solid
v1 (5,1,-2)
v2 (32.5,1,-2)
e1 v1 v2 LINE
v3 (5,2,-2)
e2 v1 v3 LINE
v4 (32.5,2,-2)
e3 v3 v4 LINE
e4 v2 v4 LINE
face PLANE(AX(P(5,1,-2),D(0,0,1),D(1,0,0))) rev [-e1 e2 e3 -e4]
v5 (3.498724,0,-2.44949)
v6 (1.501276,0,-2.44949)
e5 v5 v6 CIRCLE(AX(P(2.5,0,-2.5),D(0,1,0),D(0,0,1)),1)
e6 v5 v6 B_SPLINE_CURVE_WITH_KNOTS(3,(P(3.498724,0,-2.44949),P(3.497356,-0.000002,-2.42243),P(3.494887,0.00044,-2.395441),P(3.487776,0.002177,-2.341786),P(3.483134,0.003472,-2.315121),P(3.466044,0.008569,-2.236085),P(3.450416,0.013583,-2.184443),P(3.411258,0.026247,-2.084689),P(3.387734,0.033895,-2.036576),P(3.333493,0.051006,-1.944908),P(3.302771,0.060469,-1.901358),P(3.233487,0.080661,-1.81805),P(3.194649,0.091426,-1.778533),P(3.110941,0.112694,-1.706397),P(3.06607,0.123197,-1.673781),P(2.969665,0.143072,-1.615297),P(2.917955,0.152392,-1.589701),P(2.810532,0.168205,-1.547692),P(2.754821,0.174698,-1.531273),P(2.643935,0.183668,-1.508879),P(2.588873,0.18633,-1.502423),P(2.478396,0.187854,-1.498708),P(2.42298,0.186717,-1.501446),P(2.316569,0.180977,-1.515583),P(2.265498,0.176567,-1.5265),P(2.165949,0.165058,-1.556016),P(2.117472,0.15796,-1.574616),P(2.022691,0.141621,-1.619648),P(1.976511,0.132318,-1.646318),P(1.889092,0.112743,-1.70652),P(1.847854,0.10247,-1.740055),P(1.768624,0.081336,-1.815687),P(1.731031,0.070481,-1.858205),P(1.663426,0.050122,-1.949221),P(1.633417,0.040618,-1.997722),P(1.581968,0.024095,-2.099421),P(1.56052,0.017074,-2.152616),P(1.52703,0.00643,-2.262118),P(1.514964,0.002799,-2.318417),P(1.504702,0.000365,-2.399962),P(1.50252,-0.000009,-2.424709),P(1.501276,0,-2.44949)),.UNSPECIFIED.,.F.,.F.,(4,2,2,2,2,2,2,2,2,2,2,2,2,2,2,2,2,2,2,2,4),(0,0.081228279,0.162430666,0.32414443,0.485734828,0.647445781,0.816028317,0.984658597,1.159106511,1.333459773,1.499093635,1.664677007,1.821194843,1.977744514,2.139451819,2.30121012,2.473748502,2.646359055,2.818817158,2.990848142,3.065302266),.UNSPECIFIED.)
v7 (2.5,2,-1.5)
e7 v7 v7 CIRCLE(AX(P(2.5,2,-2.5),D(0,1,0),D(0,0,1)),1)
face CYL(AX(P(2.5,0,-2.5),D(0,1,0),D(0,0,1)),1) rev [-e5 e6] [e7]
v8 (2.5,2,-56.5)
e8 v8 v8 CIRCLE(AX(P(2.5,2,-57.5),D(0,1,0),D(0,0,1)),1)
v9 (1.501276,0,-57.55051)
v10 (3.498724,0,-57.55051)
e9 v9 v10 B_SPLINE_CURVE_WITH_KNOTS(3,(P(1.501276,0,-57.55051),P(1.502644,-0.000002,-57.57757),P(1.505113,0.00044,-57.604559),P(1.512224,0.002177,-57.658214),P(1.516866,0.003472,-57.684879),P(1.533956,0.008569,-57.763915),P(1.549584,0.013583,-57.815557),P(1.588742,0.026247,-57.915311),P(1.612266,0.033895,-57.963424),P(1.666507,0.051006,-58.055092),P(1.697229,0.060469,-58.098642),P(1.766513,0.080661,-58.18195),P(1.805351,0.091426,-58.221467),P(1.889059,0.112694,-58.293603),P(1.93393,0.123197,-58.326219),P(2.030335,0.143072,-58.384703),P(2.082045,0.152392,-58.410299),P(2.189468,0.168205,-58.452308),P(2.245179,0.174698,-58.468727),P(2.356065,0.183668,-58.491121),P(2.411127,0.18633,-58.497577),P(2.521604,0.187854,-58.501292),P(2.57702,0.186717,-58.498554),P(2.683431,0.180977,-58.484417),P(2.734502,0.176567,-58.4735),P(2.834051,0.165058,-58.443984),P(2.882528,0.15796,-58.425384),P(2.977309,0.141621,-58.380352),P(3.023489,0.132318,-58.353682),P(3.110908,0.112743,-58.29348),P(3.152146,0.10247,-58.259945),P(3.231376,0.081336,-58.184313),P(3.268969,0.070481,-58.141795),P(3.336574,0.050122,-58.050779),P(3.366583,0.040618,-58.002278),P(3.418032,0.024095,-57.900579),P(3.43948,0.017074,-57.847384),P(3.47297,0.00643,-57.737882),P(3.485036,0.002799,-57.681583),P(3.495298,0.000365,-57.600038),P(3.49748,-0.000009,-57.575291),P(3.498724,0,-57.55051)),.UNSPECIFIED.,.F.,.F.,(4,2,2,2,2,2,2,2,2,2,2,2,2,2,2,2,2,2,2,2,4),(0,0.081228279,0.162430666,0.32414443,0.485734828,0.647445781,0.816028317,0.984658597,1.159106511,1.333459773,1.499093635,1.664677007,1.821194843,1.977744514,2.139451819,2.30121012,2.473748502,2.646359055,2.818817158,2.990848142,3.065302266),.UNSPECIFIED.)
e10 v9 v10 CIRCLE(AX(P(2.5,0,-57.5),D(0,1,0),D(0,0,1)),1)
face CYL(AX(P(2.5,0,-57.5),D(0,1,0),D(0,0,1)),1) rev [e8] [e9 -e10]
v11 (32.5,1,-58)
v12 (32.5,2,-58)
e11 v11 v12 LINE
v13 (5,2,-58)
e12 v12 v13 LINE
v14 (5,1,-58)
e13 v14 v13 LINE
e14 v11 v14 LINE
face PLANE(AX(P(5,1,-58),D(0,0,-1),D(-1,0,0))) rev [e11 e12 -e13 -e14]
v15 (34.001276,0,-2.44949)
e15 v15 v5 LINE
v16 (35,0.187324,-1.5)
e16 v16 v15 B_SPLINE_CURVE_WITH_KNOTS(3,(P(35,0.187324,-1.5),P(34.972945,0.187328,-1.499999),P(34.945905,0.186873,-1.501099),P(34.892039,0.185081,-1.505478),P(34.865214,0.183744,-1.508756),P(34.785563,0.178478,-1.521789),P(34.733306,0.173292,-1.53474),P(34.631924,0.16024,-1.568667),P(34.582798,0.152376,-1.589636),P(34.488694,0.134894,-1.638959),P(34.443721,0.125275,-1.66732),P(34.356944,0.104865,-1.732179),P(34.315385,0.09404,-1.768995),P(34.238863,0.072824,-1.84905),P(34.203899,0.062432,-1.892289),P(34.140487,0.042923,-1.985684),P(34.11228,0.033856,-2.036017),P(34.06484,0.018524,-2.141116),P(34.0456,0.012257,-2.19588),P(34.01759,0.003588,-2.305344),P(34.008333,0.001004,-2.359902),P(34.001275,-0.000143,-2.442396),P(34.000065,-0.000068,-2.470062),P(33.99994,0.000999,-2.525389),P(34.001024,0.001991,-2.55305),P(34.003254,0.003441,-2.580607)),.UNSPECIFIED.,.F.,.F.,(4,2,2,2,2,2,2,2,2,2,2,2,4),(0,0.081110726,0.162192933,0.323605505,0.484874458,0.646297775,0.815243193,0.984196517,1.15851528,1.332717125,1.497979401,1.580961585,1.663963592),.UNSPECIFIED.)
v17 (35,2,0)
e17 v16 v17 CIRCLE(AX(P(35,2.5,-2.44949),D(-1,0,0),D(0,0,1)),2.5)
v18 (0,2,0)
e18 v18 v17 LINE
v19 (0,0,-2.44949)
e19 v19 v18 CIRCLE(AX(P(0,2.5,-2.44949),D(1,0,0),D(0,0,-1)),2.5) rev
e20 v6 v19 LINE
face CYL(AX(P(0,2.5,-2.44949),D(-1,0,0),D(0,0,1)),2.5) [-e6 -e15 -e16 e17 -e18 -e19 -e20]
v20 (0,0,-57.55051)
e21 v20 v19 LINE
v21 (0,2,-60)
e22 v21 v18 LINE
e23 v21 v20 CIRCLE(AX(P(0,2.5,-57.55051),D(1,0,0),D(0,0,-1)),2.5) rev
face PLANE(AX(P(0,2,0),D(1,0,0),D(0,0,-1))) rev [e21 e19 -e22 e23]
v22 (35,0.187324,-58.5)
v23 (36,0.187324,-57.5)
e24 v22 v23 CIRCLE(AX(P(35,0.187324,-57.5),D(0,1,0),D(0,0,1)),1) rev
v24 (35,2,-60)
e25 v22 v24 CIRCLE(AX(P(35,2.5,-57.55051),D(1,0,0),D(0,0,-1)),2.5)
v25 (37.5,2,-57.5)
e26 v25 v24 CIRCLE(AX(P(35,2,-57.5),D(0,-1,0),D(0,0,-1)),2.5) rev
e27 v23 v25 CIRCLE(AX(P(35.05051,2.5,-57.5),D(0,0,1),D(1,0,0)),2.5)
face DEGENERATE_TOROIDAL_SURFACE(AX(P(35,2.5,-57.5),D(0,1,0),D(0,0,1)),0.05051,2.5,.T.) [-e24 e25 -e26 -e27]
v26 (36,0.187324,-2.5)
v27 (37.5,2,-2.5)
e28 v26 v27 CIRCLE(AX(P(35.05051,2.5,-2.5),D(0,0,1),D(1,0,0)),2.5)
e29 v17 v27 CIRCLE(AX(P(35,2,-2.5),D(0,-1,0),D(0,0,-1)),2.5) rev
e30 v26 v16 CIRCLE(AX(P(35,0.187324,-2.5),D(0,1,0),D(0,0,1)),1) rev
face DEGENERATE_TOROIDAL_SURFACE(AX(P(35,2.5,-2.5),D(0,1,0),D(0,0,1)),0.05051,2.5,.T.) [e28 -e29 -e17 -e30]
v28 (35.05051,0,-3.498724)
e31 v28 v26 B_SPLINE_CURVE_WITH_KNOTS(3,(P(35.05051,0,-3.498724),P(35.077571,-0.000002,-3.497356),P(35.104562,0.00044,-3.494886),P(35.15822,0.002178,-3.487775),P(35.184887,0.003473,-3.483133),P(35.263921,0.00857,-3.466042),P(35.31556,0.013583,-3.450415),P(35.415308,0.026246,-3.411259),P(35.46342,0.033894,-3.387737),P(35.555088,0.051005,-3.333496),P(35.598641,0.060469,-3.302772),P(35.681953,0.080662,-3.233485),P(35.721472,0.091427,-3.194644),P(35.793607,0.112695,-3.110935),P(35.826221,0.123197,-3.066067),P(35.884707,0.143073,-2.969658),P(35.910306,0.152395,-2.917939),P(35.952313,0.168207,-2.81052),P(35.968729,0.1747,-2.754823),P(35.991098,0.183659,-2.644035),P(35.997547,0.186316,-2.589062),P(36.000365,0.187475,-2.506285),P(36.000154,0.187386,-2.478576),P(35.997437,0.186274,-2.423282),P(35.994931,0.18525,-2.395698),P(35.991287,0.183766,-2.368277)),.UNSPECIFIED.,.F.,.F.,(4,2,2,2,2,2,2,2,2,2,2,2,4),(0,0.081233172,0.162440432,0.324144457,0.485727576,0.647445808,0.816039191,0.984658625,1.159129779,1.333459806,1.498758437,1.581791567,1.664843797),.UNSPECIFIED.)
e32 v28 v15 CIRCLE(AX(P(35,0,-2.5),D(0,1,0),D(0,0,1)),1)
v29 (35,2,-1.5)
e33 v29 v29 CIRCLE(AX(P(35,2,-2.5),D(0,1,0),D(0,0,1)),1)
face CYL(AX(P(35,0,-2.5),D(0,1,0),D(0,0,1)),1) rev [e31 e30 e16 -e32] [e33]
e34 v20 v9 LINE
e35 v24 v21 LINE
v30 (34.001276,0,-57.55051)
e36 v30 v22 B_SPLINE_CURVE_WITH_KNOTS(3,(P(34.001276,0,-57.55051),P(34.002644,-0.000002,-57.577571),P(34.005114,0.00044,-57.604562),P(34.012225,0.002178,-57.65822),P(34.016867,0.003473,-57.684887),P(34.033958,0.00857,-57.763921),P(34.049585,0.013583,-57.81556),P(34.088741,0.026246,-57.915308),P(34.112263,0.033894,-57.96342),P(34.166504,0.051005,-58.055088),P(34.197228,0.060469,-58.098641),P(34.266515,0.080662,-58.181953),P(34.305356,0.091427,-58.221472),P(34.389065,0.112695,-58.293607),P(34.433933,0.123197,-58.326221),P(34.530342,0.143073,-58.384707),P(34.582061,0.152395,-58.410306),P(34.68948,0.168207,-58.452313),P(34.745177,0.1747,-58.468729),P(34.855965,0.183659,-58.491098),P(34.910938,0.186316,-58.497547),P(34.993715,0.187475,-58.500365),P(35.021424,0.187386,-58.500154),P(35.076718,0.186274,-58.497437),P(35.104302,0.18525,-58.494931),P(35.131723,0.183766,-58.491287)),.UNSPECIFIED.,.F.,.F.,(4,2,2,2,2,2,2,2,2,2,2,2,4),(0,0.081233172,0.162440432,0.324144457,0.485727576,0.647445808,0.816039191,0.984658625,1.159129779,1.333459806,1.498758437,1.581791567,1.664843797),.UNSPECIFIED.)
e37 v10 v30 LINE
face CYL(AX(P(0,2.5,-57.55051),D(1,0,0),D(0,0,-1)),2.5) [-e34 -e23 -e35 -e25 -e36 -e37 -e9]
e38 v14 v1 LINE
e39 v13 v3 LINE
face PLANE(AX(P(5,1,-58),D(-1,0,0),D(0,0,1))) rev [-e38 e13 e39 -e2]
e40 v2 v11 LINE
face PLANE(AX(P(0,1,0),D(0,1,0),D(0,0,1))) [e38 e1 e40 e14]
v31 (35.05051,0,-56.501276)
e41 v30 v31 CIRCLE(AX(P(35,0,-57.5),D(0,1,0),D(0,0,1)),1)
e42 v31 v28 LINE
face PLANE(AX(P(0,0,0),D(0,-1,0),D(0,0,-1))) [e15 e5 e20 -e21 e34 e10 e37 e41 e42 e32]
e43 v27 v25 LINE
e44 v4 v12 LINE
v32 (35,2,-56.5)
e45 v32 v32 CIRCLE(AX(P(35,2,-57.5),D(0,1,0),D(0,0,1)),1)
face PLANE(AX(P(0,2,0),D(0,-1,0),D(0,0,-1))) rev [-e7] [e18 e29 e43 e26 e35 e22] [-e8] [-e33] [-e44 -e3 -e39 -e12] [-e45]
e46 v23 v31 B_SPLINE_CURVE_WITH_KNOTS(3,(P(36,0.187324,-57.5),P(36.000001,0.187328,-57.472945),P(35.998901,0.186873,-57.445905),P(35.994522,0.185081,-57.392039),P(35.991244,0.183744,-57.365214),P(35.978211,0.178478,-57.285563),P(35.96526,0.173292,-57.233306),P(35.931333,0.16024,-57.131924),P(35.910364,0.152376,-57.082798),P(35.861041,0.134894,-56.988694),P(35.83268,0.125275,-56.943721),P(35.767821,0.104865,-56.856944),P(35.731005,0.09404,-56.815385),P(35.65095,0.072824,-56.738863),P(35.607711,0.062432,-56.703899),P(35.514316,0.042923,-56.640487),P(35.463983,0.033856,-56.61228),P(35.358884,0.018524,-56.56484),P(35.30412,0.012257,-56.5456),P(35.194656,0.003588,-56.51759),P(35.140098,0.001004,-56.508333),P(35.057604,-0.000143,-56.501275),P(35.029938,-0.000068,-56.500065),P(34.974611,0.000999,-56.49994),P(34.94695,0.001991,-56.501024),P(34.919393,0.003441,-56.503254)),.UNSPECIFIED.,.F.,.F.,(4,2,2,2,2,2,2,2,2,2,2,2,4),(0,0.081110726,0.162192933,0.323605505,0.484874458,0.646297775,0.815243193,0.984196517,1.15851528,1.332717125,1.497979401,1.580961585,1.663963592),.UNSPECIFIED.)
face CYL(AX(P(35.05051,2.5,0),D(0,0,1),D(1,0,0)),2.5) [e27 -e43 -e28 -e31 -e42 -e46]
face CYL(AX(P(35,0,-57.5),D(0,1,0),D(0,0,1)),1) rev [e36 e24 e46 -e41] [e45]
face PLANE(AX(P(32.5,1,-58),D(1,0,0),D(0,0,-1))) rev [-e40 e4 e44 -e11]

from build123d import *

# Parameters (mm, degrees)
SKETCH1_W           = 37.5
SKETCH1_H           = 60
BOSS_EXTRUDE1_DEPTH = 2
SKETCH2_R           = 1
CUT_EXTRUDE1_DEPTH  = 71.783119457
SKETCH3_W           = 27.5
SKETCH3_H           = 56
CUT_EXTRUDE2_DEPTH  = 1
FILLET1_R           = 2.5
FILLET2_R           = 2.5


with BuildPart() as part:
    # Sketch1 → Boss-Extrude1 (new body)
    with BuildSketch(Plane(origin=(0, 0, 0), x_dir=(1, 0, 0), z_dir=(0, 1, 0))):
        with Locations((18.75, 30)):
            Rectangle(SKETCH1_W, SKETCH1_H)
    extrude(amount=BOSS_EXTRUDE1_DEPTH)

    # Sketch2 → Cut-Extrude1 (cut, through all)
    with BuildSketch(Plane(origin=(0, 2, 0), x_dir=(1, 0, 0), z_dir=(0, 1, 0))):
        with Locations(Location((2.5, 57.5, 0), (0, 0, 270))):
            Circle(SKETCH2_R)
        with Locations(Location((35, 57.5, 0), (0, 0, 270))):
            Circle(SKETCH2_R)
        with Locations(Location((35, 2.5, 0), (0, 0, 270))):
            Circle(SKETCH2_R)
        with Locations(Location((2.5, 2.5, 0), (0, 0, 270))):
            Circle(SKETCH2_R)
    extrude(amount=-CUT_EXTRUDE1_DEPTH, mode=Mode.SUBTRACT)

    # Sketch3 → Cut-Extrude2 (cut)
    with BuildSketch(Plane(origin=(0, 2, 0), x_dir=(1, 0, 0), z_dir=(0, 1, 0))):
        with Locations((18.75, 30)):
            Rectangle(SKETCH3_W, SKETCH3_H)
    extrude(amount=-CUT_EXTRUDE2_DEPTH, mode=Mode.SUBTRACT)

    # Fillet1
    fillet1_edges = [part.edges().sort_by_distance(p)[0] for p in [
        (37.5, 1, -60),
        (37.5, 1, 0),
    ]]
    fillet(fillet1_edges, radius=FILLET1_R)

    # Fillet2
    # the kernel refuses this fillet: 2.5 mm, written as the material it takes off along each edge
    with BuildSketch(Plane(origin=(35, 0, -60), x_dir=(0, 0, 1), z_dir=(-1, 0, 0))) as fillet2_piece_1:
        with BuildLine():
            CenterArc((2.449489743, 2.5), FILLET2_R, 191.536959033, 78.463040967)
            Line((0, 2), (0, 0))
            Line((0, 0), (2.449489743, 0))
        make_face()
    extrude(amount=41.123724357, mode=Mode.SUBTRACT)
    with BuildSketch(Plane(origin=(37.5, 0, -2.5), x_dir=(-1, 0, 0), z_dir=(0, 0, -1))) as fillet2_piece_2:
        with BuildLine():
            CenterArc((2.449489743, 2.5), FILLET2_R, 191.536959033, 78.463040967)
            Line((0, 2), (0, 0))
            Line((0, 0), (2.449489743, 0))
        make_face()
    extrude(amount=55, mode=Mode.SUBTRACT)
    with BuildSketch(Plane(origin=(-6.123724357, 0, 0), x_dir=(0, 1.0, -1.574296248917966e-12), z_dir=(1, 0, 0))) as fillet2_piece_3:
        with BuildLine():
            CenterArc((2.5, -2.449489743), FILLET2_R, 101.536959033, 78.463040967)
            Line((0, -2.449489743), (0, 0))
            Line((0, 0), (2, 0))
        make_face()
    extrude(amount=41.123724357, mode=Mode.SUBTRACT)
    with BuildSketch(Plane(origin=(35, 0, -2.5), x_dir=(0, 0, 1), z_dir=(-1, 0, 0))) as fillet2_piece_4:
        with BuildLine():
            CenterArc((0.050510257, 2.5), FILLET2_R, 270, 78.463040967)
            Line((2.5, 2), (2.5, 0))
            Line((2.5, 0), (0.050510257, 0))
        make_face()
    revolve(axis=Axis((35, 0, -2.5), (0, 1, 0)), revolution_arc=90, mode=Mode.SUBTRACT)
    with BuildSketch(Plane(origin=(35, 0, -57.5), x_dir=(1, 0, 0), z_dir=(0, 0, 1))) as fillet2_piece_5:
        with BuildLine():
            CenterArc((0.050510257, 2.5), FILLET2_R, 270, 78.463040967)
            Line((2.5, 2), (2.5, 0))
            Line((2.5, 0), (0.050510257, 0))
        make_face()
    revolve(axis=Axis((35, 0, -57.5), (0, 1, 0)), revolution_arc=90, mode=Mode.SUBTRACT)


solid = part.part
